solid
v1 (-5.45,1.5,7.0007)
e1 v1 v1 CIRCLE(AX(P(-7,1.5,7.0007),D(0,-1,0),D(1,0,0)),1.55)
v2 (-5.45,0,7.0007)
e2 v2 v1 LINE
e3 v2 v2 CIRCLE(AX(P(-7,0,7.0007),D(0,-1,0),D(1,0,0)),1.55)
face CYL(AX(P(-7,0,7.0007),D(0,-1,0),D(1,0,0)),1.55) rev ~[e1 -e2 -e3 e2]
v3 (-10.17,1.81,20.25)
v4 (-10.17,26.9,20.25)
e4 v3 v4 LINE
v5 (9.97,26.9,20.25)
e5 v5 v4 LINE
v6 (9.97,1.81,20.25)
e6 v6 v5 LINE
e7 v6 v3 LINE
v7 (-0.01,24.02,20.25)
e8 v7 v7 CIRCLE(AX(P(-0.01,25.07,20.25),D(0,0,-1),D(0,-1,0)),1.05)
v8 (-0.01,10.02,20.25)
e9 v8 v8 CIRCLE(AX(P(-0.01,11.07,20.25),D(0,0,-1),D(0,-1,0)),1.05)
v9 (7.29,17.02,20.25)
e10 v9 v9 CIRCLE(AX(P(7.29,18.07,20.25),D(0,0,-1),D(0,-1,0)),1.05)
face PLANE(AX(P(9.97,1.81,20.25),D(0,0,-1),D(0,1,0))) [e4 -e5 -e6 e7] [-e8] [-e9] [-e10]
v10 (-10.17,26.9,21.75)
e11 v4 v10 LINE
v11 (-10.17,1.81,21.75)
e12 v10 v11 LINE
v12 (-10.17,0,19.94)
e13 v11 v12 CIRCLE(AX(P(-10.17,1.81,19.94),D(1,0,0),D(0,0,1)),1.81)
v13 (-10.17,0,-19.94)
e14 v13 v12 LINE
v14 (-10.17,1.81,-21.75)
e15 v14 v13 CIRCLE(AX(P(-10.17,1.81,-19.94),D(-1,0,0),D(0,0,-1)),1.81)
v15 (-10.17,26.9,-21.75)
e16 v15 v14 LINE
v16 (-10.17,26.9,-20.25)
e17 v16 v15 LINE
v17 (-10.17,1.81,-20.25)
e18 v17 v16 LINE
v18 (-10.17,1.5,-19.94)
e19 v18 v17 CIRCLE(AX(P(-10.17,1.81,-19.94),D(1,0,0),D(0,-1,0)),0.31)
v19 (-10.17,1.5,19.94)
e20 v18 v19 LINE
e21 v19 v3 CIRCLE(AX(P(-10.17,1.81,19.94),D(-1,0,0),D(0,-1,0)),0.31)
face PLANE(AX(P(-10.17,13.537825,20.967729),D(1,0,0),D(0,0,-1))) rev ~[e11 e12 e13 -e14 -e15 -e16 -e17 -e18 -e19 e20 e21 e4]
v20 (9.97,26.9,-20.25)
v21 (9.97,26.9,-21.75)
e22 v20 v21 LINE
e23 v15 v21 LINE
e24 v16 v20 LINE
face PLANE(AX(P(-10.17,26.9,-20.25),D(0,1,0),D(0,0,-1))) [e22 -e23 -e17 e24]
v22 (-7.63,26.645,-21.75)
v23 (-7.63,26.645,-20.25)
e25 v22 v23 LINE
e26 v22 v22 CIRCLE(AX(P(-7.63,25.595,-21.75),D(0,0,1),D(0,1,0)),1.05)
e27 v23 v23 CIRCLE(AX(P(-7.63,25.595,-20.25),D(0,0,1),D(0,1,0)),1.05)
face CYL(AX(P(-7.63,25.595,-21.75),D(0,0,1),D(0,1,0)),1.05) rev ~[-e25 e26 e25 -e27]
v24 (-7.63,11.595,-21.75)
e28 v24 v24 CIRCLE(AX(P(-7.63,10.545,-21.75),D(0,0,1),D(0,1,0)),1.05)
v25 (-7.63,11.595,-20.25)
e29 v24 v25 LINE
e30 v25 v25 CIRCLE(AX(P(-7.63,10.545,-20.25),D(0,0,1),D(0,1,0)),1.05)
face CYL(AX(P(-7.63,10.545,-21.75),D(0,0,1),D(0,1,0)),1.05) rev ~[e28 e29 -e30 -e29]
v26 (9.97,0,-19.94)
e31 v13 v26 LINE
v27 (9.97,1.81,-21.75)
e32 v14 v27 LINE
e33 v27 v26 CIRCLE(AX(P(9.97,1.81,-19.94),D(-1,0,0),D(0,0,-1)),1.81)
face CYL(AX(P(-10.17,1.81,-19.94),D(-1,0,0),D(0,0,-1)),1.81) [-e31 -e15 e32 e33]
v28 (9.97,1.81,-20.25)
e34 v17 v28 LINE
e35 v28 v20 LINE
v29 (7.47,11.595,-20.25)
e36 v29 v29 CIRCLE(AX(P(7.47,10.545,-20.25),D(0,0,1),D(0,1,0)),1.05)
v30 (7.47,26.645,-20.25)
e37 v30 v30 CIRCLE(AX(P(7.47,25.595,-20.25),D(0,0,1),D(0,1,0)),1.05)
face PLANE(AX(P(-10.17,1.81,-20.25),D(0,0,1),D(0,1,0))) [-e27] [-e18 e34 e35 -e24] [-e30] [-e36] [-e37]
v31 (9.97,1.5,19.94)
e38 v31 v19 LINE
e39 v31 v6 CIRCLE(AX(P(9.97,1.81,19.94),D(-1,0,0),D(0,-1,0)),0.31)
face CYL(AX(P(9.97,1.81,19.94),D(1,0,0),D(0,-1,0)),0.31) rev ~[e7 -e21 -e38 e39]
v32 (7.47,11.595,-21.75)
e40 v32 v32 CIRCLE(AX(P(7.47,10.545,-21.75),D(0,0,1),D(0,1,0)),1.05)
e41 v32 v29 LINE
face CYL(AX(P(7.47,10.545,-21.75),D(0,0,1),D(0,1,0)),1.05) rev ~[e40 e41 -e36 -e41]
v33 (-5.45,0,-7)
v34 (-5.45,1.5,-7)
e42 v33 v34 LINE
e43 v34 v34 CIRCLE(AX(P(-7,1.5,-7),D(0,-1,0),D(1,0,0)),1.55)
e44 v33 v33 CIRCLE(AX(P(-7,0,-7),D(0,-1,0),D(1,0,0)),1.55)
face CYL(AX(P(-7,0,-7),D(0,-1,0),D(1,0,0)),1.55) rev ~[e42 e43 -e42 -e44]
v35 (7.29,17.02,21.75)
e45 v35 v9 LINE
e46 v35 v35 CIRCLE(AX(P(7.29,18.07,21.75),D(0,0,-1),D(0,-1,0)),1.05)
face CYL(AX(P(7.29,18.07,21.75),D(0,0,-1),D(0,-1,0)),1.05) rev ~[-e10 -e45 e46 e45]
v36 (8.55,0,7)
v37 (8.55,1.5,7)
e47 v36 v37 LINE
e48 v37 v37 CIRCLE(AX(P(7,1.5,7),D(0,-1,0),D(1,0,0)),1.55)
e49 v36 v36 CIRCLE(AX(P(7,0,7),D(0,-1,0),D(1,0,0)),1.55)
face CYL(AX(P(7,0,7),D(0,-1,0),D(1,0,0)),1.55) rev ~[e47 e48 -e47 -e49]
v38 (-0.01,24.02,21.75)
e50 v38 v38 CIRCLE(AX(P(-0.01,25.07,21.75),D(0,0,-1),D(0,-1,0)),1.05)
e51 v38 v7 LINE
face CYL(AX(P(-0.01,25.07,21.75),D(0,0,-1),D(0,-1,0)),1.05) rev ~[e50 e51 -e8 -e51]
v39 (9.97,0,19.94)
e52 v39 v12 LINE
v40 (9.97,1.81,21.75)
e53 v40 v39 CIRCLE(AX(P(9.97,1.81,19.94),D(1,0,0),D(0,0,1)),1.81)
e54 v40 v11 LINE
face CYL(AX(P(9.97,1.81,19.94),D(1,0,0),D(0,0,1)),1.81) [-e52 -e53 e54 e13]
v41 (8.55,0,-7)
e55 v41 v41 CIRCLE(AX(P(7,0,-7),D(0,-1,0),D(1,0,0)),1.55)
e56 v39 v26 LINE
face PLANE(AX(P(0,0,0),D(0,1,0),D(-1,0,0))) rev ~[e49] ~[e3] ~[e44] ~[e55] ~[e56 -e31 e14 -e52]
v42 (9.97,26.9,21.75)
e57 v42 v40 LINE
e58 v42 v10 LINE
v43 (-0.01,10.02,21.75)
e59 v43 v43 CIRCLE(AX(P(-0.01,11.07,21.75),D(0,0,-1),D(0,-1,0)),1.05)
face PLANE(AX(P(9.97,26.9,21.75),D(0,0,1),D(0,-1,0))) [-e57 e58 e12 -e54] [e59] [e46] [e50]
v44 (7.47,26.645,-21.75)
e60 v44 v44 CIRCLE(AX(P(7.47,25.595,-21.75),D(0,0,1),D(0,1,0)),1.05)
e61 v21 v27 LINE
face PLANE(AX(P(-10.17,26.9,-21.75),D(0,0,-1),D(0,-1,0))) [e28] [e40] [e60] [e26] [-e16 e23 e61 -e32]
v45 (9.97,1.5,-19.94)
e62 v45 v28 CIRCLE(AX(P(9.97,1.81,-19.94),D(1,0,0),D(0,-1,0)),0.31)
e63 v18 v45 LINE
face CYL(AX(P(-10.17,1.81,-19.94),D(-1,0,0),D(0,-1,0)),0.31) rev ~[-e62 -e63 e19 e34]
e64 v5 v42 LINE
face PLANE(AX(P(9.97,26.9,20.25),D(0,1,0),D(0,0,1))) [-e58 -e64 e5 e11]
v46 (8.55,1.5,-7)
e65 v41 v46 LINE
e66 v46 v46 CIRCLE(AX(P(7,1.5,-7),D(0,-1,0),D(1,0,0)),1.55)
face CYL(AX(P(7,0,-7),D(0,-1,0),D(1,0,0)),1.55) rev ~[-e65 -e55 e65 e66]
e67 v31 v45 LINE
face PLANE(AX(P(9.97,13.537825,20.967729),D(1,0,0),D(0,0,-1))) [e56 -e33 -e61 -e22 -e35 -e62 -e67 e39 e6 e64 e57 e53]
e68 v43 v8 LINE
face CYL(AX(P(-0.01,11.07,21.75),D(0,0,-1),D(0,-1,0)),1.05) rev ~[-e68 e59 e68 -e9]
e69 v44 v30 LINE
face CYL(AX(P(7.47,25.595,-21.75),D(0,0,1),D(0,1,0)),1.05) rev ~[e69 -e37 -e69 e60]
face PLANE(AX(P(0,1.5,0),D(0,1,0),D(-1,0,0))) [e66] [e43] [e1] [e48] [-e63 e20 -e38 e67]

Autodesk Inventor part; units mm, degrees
ref_plane "YZ Plane" through (0, 0, 0) normal (1, 0, 0) x (0, 1, 0)
ref_plane "XZ Plane" through (0, 0, 0) normal (0, 1, 0) x (-1, 0, 0)
ref_plane "XY Plane" through (0, 0, 0) normal (0, 0, 1) x (1, 0, 0)
sketch "Sketch1" plane through (0, 0, 0) normal (0, 1, 0) x (-1, 0, 0)
  line L0 (10.17, 20.25) -> (-9.97, 20.25)
  line L1 (-9.97, 20.25) -> (-9.97, -20.25)
  line L2 (-9.97, -20.25) -> (10.17, -20.25)
  line L3 (10.17, -20.25) -> (10.17, 20.25)
  point P0 (0, 0)
  dimension "d0" = 40.5
  dimension "d1" = 20.14
  dimension "d2" = 10.17
  dimension "d3" = 20.25
extrude "Plate1" add sketch "Sketch1" along normal blind 1.5
sketch "Sketch2" plane through (9.97, 0, 21.75) normal (0, 0, -1) x (-1, 0, 0)
  line L0 (20.14, 0) -> (0, 0)
  line L1 (0, 0) -> (0, 26.9)
  line L2 (0, 26.9) -> (20.14, 26.9)
  line L3 (20.14, 26.9) -> (20.14, 0)
edge flange "Flange1" height 26.9 angle 90 thickness 1.5 bend radius 0.31 thickness toward (0, 0, -1) relief tear relief width 1.5 relief depth 0.75 corner gap 0.31 corner form 0 edges at (-0.1, 1.5, 20.25) (-0.1, 1.5, -20.25) wall of the first edge with corners at (-10.17, 0, 21.75) (9.97, 0, 21.75) (9.97, 26.9, 21.75) (-10.17, 26.9, 21.75)
bend "Bend1"
corner "Corner1"
sketch "Sketch3" plane through (-10.17, 26.9, 21.75) normal (0, 0, 1) x (1, 0, 0)
  circle A0 centre (10.16, -1.83) radius 0.7835 projected
  circle A1 centre (10.16, -15.83) radius 0.7835 projected
  circle A2 centre (17.46, -8.83) radius 0.7835 projected
  point P0 (10.17, -26.9)
hole "Hole1" at (-0.01, 25.07, 21.75) at (7.29, 18.07, 21.75) at (-0.01, 11.07, 21.75) direction (0, 0, -1) diameter 2.1 depth 1.5
sketch "Sketch4" plane through (9.97, 26.9, -21.75) normal (0, 0, -1) x (-1, 0, 0)
  circle A0 centre (2.5, -16.355) radius 0.7835 projected
  circle A1 centre (17.6, -16.355) radius 0.7835 projected
  circle A2 centre (17.6, -1.305) radius 0.7835 projected
  circle A3 centre (2.5, -1.305) radius 0.7835 projected
  point P0 (9.97, -26.9)
hole "Hole2" at (-7.63, 25.595, -21.75) at (-7.63, 10.545, -21.75) at (7.47, 10.545, -21.75) at (7.47, 25.595, -21.75) direction (0, 0, 1) diameter 2.1 depth 1.5
sketch "Sketch5" plane through (0, 0, 0) normal (0, -1, 0) x (1, 0, 0)
  circle A0 centre (-7, 7.0007) radius 1.55
  circle A1 centre (7, 7) radius 1.55
  circle A2 centre (7, -7) radius 1.55
  circle A3 centre (-7, -7) radius 1.55
  point P0 (0, 0)
  dimension "d29" = 3.1
  dimension "d30" = 7
  dimension "d31" = 9.9
  dimension "d32" = 3.1
  dimension "d33" = 7
  dimension "d34" = 7
  dimension "d35" = 3.1
  dimension "d36" = 7
  dimension "d37" = 7
  dimension "d38" = 3.1
  dimension "d39" = 7
  dimension "d40" = 7
extrude "Cut1" cut sketch "Sketch5" against normal blind 1.5
equation "\"d20\" = Thickness"
equation "\"d27\" = Thickness"
equation "\"d41\" = Thickness"
equation "\"d4\" = Thickness"
equation "\"d5\" = BendReliefWidth"
equation "\"d6\" = BendReliefDepth"
equation "\"d7\" = MinimumRemnant"
equation "\"d8\" = TransitionRadius"
equation "\"d11\" = BendRadius"
equation "\"d12\" = CornerReliefSize"
equation "\"d13\" = GapSize"
equation "\"d14\" = JacobiRadiusSize"
equation "\"BendReliefWidth\" = Thickness"
equation "\"BendReliefDepth\" = 0.5 * Thickness"
equation "\"CornerReliefSize\" = 4 * Thickness"
equation "\"MinimumRemnant\" = 2 * Thickness"
equation "\"TransitionRadius\" = BendRadius"
equation "\"JacobiRadiusSize\" = BendRadius"
equation "\"GapSize\" = Thickness"
equation "\"Thickness\" = 1.5"
equation "\"BendRadius\" = 0.31"
properties part number "axis_25_bottom_frame" material "Aluminum 6061-AHC"
